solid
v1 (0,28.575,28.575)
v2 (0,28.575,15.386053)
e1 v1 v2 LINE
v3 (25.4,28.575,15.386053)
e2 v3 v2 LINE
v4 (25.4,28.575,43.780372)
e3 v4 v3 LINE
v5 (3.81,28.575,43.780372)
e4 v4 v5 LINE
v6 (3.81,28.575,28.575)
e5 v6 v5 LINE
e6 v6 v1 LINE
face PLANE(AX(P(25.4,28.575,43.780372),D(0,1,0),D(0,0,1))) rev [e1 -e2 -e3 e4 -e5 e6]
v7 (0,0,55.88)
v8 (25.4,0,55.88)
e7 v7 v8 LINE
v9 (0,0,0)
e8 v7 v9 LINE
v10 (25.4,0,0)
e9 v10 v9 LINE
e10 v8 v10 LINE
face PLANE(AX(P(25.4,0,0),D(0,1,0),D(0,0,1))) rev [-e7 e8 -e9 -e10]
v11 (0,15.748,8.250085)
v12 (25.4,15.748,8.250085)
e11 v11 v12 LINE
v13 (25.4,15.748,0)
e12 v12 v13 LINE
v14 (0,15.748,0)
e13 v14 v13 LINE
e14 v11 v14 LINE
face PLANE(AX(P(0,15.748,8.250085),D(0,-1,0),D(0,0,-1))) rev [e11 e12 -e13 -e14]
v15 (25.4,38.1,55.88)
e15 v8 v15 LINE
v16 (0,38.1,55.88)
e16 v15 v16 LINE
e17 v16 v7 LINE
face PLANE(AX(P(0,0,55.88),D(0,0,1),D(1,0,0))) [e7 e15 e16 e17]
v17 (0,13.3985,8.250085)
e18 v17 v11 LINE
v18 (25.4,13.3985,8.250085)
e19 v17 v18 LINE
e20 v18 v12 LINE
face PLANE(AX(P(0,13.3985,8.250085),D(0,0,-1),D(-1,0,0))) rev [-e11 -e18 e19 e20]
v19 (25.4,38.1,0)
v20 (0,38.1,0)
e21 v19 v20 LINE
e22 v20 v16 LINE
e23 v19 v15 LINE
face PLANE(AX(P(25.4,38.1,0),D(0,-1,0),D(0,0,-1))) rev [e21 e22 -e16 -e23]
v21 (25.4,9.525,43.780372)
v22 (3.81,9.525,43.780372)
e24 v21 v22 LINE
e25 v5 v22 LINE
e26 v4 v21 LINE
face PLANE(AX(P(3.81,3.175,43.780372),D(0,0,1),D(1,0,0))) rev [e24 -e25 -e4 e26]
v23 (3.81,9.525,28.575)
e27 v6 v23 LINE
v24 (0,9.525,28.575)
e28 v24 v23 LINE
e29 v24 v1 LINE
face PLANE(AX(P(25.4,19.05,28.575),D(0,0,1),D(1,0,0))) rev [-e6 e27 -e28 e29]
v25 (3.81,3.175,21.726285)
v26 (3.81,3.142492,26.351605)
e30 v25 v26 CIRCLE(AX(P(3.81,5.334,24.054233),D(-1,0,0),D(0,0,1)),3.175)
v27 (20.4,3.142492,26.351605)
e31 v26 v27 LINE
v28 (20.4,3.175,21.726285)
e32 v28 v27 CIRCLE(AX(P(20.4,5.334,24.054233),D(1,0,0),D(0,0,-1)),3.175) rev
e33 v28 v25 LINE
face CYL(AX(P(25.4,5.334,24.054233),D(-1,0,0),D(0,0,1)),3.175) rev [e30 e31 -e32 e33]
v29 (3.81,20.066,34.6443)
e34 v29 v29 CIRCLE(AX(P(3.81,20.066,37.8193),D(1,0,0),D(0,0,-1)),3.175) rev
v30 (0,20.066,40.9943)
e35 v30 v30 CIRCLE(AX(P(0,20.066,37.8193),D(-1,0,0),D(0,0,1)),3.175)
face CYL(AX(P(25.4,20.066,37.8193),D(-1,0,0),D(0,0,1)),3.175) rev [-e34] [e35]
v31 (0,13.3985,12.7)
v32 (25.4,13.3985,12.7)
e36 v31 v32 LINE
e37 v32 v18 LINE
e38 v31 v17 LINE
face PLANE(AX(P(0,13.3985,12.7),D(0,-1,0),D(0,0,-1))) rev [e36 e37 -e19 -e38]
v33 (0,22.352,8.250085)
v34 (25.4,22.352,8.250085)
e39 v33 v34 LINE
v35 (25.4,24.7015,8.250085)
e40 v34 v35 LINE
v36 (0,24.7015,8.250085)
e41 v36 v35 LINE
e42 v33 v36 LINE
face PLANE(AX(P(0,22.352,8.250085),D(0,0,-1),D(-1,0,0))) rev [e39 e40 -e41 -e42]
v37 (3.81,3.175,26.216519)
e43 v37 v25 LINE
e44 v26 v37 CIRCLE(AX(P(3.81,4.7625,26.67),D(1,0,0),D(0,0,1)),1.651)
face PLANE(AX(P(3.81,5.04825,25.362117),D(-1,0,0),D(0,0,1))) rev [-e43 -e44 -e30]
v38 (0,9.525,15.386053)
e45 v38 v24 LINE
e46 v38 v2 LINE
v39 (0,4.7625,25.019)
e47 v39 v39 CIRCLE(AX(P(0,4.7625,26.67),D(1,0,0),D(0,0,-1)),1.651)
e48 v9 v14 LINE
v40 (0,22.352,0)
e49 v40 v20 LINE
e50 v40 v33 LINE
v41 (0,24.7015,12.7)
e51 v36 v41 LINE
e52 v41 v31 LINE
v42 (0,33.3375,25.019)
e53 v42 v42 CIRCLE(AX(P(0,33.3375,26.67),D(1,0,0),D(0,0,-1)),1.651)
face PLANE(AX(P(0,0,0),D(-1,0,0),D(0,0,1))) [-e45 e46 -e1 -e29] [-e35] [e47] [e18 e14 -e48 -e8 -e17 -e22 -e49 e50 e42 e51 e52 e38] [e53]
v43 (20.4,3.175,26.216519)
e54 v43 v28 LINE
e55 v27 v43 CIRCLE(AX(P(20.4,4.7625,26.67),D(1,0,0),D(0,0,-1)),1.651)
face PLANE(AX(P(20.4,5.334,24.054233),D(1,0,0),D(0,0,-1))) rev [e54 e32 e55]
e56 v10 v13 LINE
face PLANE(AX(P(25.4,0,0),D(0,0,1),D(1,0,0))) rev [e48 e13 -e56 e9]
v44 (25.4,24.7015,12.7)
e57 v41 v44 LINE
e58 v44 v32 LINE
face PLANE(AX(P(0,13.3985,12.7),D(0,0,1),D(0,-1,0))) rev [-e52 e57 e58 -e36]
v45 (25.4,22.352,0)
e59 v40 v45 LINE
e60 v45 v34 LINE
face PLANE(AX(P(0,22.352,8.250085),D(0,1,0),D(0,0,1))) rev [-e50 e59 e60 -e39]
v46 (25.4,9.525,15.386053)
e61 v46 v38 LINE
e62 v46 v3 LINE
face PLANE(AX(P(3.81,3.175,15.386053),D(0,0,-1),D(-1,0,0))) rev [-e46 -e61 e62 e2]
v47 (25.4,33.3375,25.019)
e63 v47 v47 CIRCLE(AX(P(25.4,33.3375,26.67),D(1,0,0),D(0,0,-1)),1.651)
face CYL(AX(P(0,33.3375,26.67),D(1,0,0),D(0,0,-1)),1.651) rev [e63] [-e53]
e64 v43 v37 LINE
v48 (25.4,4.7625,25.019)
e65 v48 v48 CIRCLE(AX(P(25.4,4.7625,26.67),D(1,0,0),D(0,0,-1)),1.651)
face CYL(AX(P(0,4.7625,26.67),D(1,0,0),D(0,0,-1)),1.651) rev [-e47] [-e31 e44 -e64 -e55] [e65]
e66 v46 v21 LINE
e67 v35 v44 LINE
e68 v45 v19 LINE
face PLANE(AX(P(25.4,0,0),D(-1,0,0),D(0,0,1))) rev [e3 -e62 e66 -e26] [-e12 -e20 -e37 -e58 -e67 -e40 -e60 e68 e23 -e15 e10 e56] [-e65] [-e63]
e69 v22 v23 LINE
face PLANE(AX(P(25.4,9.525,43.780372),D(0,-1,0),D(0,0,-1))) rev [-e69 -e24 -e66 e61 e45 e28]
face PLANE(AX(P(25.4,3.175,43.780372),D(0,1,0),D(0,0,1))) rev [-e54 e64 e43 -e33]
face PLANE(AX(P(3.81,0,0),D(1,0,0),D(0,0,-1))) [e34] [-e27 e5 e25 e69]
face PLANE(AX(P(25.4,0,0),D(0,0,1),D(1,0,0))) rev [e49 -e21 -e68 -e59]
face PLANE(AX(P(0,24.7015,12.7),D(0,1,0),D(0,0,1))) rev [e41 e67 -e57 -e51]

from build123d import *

# Parameters (mm, degrees)
SKETCH1_W                 = 38.1
SKETCH1_H                 = 50.8
BOSS_EXTRUDE1_DEPTH       = 25.4
CUT_EXTRUDE1_DEPTH        = 25.4
SKETCH3_W                 = 31.75
SKETCH3_H                 = 31.75
CUT_EXTRUDE2_DEPTH        = 21.59
SKETCH5_W                 = 12.7
SKETCH5_H                 = 12.7
CUT_EXTRUDE3_DEPTH        = 3.81
SKETCH4_W                 = 12.7
SKETCH4_H                 = 25.4
CUT_EXTRUDE4_DEPTH        = 3.175
SKETCH6_W                 = 6.35
SKETCH6_H                 = 5.08
SKETCH6_W_2               = 31.75
BOSS_EXTRUDE2_DEPTH       = 25.4
CUT_EXTRUDE5_START        = -25.4
SKETCH7_R                 = 1.7145
CUT_EXTRUDE5_DEPTH        = 25.4
SKETCH8_R                 = 3.175
CUT_EXTRUDE6_DEPTH        = 18.796
CUT_EXTRUDE7_START        = -25.4
SKETCH9_R                 = 3.175
CUT_EXTRUDE7_DEPTH        = 25.4
SKETCH10_R                = 4.826
SKETCH10_R_2              = 3.175
SKETCH10_R_3              = 4.7625
BOSS_EXTRUDE3_DEPTH       = 25.4
SKETCH11_R                = 3.175
BOSS_EXTRUDE4_DEPTH       = 25.4
SKETCH12_R                = 3.175
SKETCH12_R_2              = 1.651
BOSS_EXTRUDE5_DEPTH       = 5
BOSS_EXTRUDE6_DEPTH       = 25.4
BOSS_EXTRUDE7_DEPTH       = 25.4
SKETCH15_W                = 25.4
SKETCH15_H                = 38.1
BOSS_EXTRUDE8_DEPTH       = 5.08
CUT_EXTRUDE9_START        = -21.59
SKETCH16_W                = 9.228
SKETCH16_H                = 3.577281452
CUT_EXTRUDE9_DEPTH        = 21.59
FILLET1_R                 = 30.48
FILLET2_R                 = 2.54
CUT_EXTRUDE10_START       = -21.59
SKETCH17_W                = 31.75
SKETCH17_H                = 27.158947133
CUT_EXTRUDE10_DEPTH       = 21.59
CUT_EXTRUDE11_START       = -21.59
SKETCH18_W                = 31.75
SKETCH18_H                = 1.235371837
CUT_EXTRUDE11_DEPTH       = 21.59
SKETCH19_W                = 5.08
SKETCH19_H                = 28.39431897
BOSS_EXTRUDE9_DEPTH       = 21.59
SKETCH20_R                = 1.651
CUT_EXTRUDE12_DEPTH       = 25.4
BOSS_EXTRUDE10_START      = -3.81
BOSS_EXTRUDE10_DEPTH      = 3.81
SKETCH23_W                = 21.59
SKETCH23_H                = 13.188947133
CUT_EXTRUDE13_DEPTH       = 3.81
BOSS_EXTRUDE13_DEPTH      = 21.59
BOSS_EXTRUDE13_DEPTH_BACK = 3.81
SKETCH24_W                = 1.27
SKETCH24_H                = 28.39431897
SKETCH25_W                = 12.7
SKETCH25_H                = 2.686052867
BOSS_EXTRUDE14_DEPTH      = 31.75


with BuildPart() as part:
    # Sketch1 → Boss-Extrude1 (new body)
    with BuildSketch(Plane.YZ):
        with Locations((19.05, 25.4)):
            Rectangle(SKETCH1_W, SKETCH1_H)
    extrude(amount=BOSS_EXTRUDE1_DEPTH)

    # Sketch2 → Cut-Extrude1 (cut)
    with BuildSketch(Plane.YZ.offset(25.4)):
        Polygon((13.3985, 12.7), (24.7015, 12.7), (24.7015, 8.250084788), (22.352, 8.250084788), (22.352, 0), (15.748, 0), (15.748, 8.250084788), (13.3985, 8.250084788), align=None)
    extrude(amount=-CUT_EXTRUDE1_DEPTH, mode=Mode.SUBTRACT)

    # Sketch3 → Cut-Extrude2 (cut)
    with BuildSketch(Plane.YZ.offset(25.4)):
        with Locations((19.05, 31.75)):
            Rectangle(SKETCH3_W, SKETCH3_H)
    extrude(amount=-CUT_EXTRUDE2_DEPTH, mode=Mode.SUBTRACT)

    # Sketch5 → Cut-Extrude3 (cut)
    with BuildSketch(Plane(origin=(0, 0, 0), x_dir=(0, -1, 0), z_dir=(-1, 0, 0))):
        with Locations((-12.7, 22.225)):
            Rectangle(SKETCH5_W, SKETCH5_H)
    extrude(amount=-CUT_EXTRUDE3_DEPTH, mode=Mode.SUBTRACT)

    # Sketch4 → Cut-Extrude4 (cut)
    with BuildSketch(Plane.XY.offset(15.875)):
        with Locations((10.16, 19.05)):
            Rectangle(SKETCH4_W, SKETCH4_H)
    extrude(amount=-CUT_EXTRUDE4_DEPTH, mode=Mode.SUBTRACT)

    # Sketch6 → Boss-Extrude2 (add)
    with BuildSketch(Plane.YZ.offset(25.4)):
        with Locations((6.35, 18.415)):
            Rectangle(SKETCH6_W, SKETCH6_H)
        with Locations((31.75, 18.415)):
            Rectangle(SKETCH6_W, SKETCH6_H)
        with Locations((19.05, 45.085)):
            Rectangle(SKETCH6_W_2, SKETCH6_H)
    extrude(amount=-BOSS_EXTRUDE2_DEPTH)

    # Sketch7 → Cut-Extrude5 (cut)
    with BuildSketch(Plane(origin=(0, 0, 0), x_dir=(0, -1, 0), z_dir=(-1, 0, 0)).offset(CUT_EXTRUDE5_START)):
        with Locations(Location((-20.066, 46.303766696, 0), (0, 0, 90))):
            Circle(SKETCH7_R)
        with Locations(Location((-5.334, 46.303766696, 0), (0, 0, 90))):
            Circle(SKETCH7_R)
        with Locations(Location((-4.496233304, 16.002, 0), (0, 0, 90))):
            Circle(SKETCH7_R)
        with Locations(Location((-20.903766696, 16.002, 0), (0, 0, 90))):
            Circle(SKETCH7_R)
    extrude(amount=CUT_EXTRUDE5_DEPTH, mode=Mode.SUBTRACT)

    # Sketch8 → Cut-Extrude6 (cut)
    with BuildSketch(Plane(origin=(0, 0, 0), x_dir=(0, -1, 0), z_dir=(-1, 0, 0))):
        with Locations(Location((-20.066, 46.303766696, 0), (0, 0, 90))):
            Circle(SKETCH8_R)
        with Locations(Location((-5.334, 46.303766696, 0), (0, 0, 90))):
            Circle(SKETCH8_R)
        with Locations(Location((-4.496233304, 16.002, 0), (0, 0, 90))):
            Circle(SKETCH8_R)
        with Locations((-20.903766696, 16.002)):
            Circle(SKETCH8_R)
    extrude(amount=-CUT_EXTRUDE6_DEPTH, mode=Mode.SUBTRACT)

    # Sketch9 → Cut-Extrude7 (cut)
    with BuildSketch(Plane(origin=(0, 0, 0), x_dir=(0, -1, 0), z_dir=(-1, 0, 0)).offset(CUT_EXTRUDE7_START)):
        with Locations(Location((-20.066, 37.819300087, 0), (0, 0, 90))):
            Circle(SKETCH9_R)
        with Locations((-5.334, 24.054233304)):
            Circle(SKETCH9_R)
    extrude(amount=CUT_EXTRUDE7_DEPTH, mode=Mode.SUBTRACT)

    # Sketch10 → Boss-Extrude3 (add)
    # profile 1 of 2: a face of its own
    with BuildSketch(Plane.YZ.offset(25.4)):
        with Locations((5.334, 24.054233304)):
            Circle(SKETCH10_R)
        with Locations(Location((5.334, 24.054233304, 0), (0, 0, 90))):
            Circle(SKETCH10_R_2, mode=Mode.SUBTRACT)
    # profile 2 of 2: a face of its own
    with BuildSketch(Plane.YZ.offset(25.4)):
        with Locations((20.066, 37.819300087)):
            Circle(SKETCH10_R_3)
        with Locations(Location((20.066, 37.819300087, 0), (0, 0, 90))):
            Circle(SKETCH10_R_2, mode=Mode.SUBTRACT)
    extrude(amount=-BOSS_EXTRUDE3_DEPTH)

    # Sketch11 → Boss-Extrude4 (add)
    with BuildSketch(Plane(origin=(0, 0, 0), x_dir=(0, -1, 0), z_dir=(-1, 0, 0))):
        with Locations(Location((-20.903766696, 16.002, 0), (0, 0, 357.707557224))):
            Circle(SKETCH11_R)
        with Locations((-4.496233304, 16.002)):
            Circle(SKETCH11_R)
        with Locations((-20.066, 46.303766696)):
            Circle(SKETCH11_R)
        with Locations((-5.334, 46.303766696)):
            Circle(SKETCH11_R)
    extrude(amount=-BOSS_EXTRUDE4_DEPTH)

    # Sketch12 → Boss-Extrude5 (add)
    # profile 1 of 2: a face of its own
    with BuildSketch(Plane.YZ.offset(25.4)):
        with Locations(Location((5.334, 24.054233304, 0), (0, 0, 90))):
            Circle(SKETCH12_R)
        with Locations(Location((5.334, 24.054233304, 0), (0, 0, 270))):
            Circle(SKETCH12_R_2, mode=Mode.SUBTRACT)
    # profile 2 of 2: a face of its own
    with BuildSketch(Plane.YZ.offset(25.4)):
        with Locations(Location((20.066, 37.819300087, 0), (0, 0, 90))):
            Circle(SKETCH12_R)
        with Locations(Location((20.066, 37.819300087, 0), (0, 0, 270))):
            Circle(SKETCH12_R_2, mode=Mode.SUBTRACT)
    extrude(amount=-BOSS_EXTRUDE5_DEPTH)

    # Sketch13 → Boss-Extrude6 (add)
    with BuildSketch(Plane.YZ.offset(25.4)):
        with BuildLine():
            Line((22.225, 42.064311895), (22.225, 42.545))
            Line((22.225, 42.545), (20.656903194, 42.545))
            ThreePointArc((20.656903194, 42.545), (21.461799827, 42.372666874), (22.225, 42.064311895))
        make_face()
    extrude(amount=-BOSS_EXTRUDE6_DEPTH)

    # Sketch14 → Boss-Extrude7 (add)
    with BuildSketch(Plane.YZ.offset(25.4)):
        with BuildLine():
            Line((19.475096806, 42.545), (15.3035, 42.545))
            Line((15.3035, 42.545), (15.3035, 37.819300087))
            ThreePointArc((15.3035, 37.819300087), (16.495595071, 40.971063862), (19.475096806, 42.545))
        make_face()
    extrude(amount=-BOSS_EXTRUDE7_DEPTH)

    # Sketch15 → Boss-Extrude8 (add)
    with BuildSketch(Plane.XY.offset(50.8)):
        with Locations((12.7, 19.05)):
            Rectangle(SKETCH15_W, SKETCH15_H)
    extrude(amount=BOSS_EXTRUDE8_DEPTH)

    # Sketch16 → Cut-Extrude9 (cut)
    with BuildSketch(Plane.YZ.offset(25.4).offset(CUT_EXTRUDE9_START)):
        with Locations((12.700000043, 41.880359274)):
            Rectangle(SKETCH16_W, SKETCH16_H)
    extrude(amount=CUT_EXTRUDE9_DEPTH, mode=Mode.SUBTRACT)

    # Fillet1
    # the kernel refuses this fillet: 30.48 mm, written as the material it takes off along each edge
    with BuildSketch(Plane(origin=(3.81, 15.3035, 40.091718548), x_dir=(0, 0, -1), z_dir=(1, 0, 0))) as fillet1_piece_1:
        with BuildLine():
            CenterArc((10.886595988, 30.48), FILLET1_R, 249.07339313, 20.92660687)
            Line((0, 2.010500043), (0, 0))
            Line((0, 0), (10.886595988, 0))
        make_face()
    extrude(amount=48.806489969, mode=Mode.SUBTRACT)

    # Fillet2
    fillet2_edges = [part.edges().sort_by_distance(p)[0] for p in [
        (14.605, 15.945995831, 35.430373154),
    ]]
    fillet(fillet2_edges, radius=FILLET2_R)

    # Sketch17 → Cut-Extrude10 (cut)
    with BuildSketch(Plane.YZ.offset(25.4).offset(CUT_EXTRUDE10_START)):
        with Locations((19.05, 28.965526434)):
            Rectangle(SKETCH17_W, SKETCH17_H)
    extrude(amount=CUT_EXTRUDE10_DEPTH, mode=Mode.SUBTRACT)

    # Sketch18 → Cut-Extrude11 (cut)
    with BuildSketch(Plane.YZ.offset(25.4).offset(CUT_EXTRUDE11_START)):
        with Locations((19.05, 43.162685919)):
            Rectangle(SKETCH18_W, SKETCH18_H)
    extrude(amount=CUT_EXTRUDE11_DEPTH, mode=Mode.SUBTRACT)

    # Sketch19 → Boss-Extrude9 (add)
    with BuildSketch(Plane.YZ.offset(3.81)):
        with Locations((5.715, 29.583212352)):
            Rectangle(SKETCH19_W, SKETCH19_H)
        with Locations((32.385, 29.583212352)):
            Rectangle(SKETCH19_W, SKETCH19_H)
    extrude(amount=BOSS_EXTRUDE9_DEPTH)

    # Sketch20 → Cut-Extrude12 (cut)
    with BuildSketch(Plane.YZ.offset(25.4)):
        with Locations(Location((4.7625, 26.67, 0), (0, 0, 270))):
            Circle(SKETCH20_R)
        with Locations(Location((33.3375, 26.67, 0), (0, 0, 270))):
            Circle(SKETCH20_R)
    extrude(amount=-CUT_EXTRUDE12_DEPTH, mode=Mode.SUBTRACT)

    # Sketch22 → Boss-Extrude10 (add)
    with BuildSketch(Plane(origin=(0, 0, 0), x_dir=(0, -1, 0), z_dir=(-1, 0, 0)).offset(BOSS_EXTRUDE10_START)):
        with BuildLine():
            Line((-7.023066157, 28.575), (-8.255, 28.575))
            Line((-8.255, 28.575), (-8.255, 27.895852104))
            ThreePointArc((-8.255, 27.895852104), (-7.663911578, 28.280554168), (-7.023066157, 28.575))
        make_face()
        with BuildLine():
            ThreePointArc((-6.367681938, 27.056253732), (-5.182460289, 25.073305178), (-3.175, 26.216519295))
            ThreePointArc((-3.175, 26.216519295), (-3.157324346, 26.283720153), (-3.142492042, 26.351605253))
            ThreePointArc((-3.142492042, 26.351605253), (-6.011696572, 20.952402819), (-6.367681938, 27.056253732))
        make_face()
    extrude(amount=BOSS_EXTRUDE10_DEPTH)

    # Sketch23 → Cut-Extrude13 (cut)
    with BuildSketch(Plane.YZ.offset(3.81)):
        with Locations((19.05, 21.980526434)):
            Rectangle(SKETCH23_W, SKETCH23_H)
    extrude(amount=-CUT_EXTRUDE13_DEPTH, mode=Mode.SUBTRACT)

    # Sketch24 → Boss-Extrude13 (add, two sides: drawn at the far end of the back side and taken through both)
    with BuildSketch(Plane.YZ.offset(3.81).offset(-BOSS_EXTRUDE13_DEPTH_BACK)):
        with Locations((29.21, 29.583212352)):
            Rectangle(SKETCH24_W, SKETCH24_H)
        with Locations((8.89, 29.583212352)):
            Rectangle(SKETCH24_W, SKETCH24_H)
    extrude(amount=BOSS_EXTRUDE13_DEPTH + BOSS_EXTRUDE13_DEPTH_BACK)

    # Sketch25 → Boss-Extrude14 (add)
    with BuildSketch(Plane.XZ.offset(-31.75)):
        with Locations((10.16, 14.043026433)):
            Rectangle(SKETCH25_W, SKETCH25_H)
    extrude(amount=BOSS_EXTRUDE14_DEPTH)


solid = part.part
